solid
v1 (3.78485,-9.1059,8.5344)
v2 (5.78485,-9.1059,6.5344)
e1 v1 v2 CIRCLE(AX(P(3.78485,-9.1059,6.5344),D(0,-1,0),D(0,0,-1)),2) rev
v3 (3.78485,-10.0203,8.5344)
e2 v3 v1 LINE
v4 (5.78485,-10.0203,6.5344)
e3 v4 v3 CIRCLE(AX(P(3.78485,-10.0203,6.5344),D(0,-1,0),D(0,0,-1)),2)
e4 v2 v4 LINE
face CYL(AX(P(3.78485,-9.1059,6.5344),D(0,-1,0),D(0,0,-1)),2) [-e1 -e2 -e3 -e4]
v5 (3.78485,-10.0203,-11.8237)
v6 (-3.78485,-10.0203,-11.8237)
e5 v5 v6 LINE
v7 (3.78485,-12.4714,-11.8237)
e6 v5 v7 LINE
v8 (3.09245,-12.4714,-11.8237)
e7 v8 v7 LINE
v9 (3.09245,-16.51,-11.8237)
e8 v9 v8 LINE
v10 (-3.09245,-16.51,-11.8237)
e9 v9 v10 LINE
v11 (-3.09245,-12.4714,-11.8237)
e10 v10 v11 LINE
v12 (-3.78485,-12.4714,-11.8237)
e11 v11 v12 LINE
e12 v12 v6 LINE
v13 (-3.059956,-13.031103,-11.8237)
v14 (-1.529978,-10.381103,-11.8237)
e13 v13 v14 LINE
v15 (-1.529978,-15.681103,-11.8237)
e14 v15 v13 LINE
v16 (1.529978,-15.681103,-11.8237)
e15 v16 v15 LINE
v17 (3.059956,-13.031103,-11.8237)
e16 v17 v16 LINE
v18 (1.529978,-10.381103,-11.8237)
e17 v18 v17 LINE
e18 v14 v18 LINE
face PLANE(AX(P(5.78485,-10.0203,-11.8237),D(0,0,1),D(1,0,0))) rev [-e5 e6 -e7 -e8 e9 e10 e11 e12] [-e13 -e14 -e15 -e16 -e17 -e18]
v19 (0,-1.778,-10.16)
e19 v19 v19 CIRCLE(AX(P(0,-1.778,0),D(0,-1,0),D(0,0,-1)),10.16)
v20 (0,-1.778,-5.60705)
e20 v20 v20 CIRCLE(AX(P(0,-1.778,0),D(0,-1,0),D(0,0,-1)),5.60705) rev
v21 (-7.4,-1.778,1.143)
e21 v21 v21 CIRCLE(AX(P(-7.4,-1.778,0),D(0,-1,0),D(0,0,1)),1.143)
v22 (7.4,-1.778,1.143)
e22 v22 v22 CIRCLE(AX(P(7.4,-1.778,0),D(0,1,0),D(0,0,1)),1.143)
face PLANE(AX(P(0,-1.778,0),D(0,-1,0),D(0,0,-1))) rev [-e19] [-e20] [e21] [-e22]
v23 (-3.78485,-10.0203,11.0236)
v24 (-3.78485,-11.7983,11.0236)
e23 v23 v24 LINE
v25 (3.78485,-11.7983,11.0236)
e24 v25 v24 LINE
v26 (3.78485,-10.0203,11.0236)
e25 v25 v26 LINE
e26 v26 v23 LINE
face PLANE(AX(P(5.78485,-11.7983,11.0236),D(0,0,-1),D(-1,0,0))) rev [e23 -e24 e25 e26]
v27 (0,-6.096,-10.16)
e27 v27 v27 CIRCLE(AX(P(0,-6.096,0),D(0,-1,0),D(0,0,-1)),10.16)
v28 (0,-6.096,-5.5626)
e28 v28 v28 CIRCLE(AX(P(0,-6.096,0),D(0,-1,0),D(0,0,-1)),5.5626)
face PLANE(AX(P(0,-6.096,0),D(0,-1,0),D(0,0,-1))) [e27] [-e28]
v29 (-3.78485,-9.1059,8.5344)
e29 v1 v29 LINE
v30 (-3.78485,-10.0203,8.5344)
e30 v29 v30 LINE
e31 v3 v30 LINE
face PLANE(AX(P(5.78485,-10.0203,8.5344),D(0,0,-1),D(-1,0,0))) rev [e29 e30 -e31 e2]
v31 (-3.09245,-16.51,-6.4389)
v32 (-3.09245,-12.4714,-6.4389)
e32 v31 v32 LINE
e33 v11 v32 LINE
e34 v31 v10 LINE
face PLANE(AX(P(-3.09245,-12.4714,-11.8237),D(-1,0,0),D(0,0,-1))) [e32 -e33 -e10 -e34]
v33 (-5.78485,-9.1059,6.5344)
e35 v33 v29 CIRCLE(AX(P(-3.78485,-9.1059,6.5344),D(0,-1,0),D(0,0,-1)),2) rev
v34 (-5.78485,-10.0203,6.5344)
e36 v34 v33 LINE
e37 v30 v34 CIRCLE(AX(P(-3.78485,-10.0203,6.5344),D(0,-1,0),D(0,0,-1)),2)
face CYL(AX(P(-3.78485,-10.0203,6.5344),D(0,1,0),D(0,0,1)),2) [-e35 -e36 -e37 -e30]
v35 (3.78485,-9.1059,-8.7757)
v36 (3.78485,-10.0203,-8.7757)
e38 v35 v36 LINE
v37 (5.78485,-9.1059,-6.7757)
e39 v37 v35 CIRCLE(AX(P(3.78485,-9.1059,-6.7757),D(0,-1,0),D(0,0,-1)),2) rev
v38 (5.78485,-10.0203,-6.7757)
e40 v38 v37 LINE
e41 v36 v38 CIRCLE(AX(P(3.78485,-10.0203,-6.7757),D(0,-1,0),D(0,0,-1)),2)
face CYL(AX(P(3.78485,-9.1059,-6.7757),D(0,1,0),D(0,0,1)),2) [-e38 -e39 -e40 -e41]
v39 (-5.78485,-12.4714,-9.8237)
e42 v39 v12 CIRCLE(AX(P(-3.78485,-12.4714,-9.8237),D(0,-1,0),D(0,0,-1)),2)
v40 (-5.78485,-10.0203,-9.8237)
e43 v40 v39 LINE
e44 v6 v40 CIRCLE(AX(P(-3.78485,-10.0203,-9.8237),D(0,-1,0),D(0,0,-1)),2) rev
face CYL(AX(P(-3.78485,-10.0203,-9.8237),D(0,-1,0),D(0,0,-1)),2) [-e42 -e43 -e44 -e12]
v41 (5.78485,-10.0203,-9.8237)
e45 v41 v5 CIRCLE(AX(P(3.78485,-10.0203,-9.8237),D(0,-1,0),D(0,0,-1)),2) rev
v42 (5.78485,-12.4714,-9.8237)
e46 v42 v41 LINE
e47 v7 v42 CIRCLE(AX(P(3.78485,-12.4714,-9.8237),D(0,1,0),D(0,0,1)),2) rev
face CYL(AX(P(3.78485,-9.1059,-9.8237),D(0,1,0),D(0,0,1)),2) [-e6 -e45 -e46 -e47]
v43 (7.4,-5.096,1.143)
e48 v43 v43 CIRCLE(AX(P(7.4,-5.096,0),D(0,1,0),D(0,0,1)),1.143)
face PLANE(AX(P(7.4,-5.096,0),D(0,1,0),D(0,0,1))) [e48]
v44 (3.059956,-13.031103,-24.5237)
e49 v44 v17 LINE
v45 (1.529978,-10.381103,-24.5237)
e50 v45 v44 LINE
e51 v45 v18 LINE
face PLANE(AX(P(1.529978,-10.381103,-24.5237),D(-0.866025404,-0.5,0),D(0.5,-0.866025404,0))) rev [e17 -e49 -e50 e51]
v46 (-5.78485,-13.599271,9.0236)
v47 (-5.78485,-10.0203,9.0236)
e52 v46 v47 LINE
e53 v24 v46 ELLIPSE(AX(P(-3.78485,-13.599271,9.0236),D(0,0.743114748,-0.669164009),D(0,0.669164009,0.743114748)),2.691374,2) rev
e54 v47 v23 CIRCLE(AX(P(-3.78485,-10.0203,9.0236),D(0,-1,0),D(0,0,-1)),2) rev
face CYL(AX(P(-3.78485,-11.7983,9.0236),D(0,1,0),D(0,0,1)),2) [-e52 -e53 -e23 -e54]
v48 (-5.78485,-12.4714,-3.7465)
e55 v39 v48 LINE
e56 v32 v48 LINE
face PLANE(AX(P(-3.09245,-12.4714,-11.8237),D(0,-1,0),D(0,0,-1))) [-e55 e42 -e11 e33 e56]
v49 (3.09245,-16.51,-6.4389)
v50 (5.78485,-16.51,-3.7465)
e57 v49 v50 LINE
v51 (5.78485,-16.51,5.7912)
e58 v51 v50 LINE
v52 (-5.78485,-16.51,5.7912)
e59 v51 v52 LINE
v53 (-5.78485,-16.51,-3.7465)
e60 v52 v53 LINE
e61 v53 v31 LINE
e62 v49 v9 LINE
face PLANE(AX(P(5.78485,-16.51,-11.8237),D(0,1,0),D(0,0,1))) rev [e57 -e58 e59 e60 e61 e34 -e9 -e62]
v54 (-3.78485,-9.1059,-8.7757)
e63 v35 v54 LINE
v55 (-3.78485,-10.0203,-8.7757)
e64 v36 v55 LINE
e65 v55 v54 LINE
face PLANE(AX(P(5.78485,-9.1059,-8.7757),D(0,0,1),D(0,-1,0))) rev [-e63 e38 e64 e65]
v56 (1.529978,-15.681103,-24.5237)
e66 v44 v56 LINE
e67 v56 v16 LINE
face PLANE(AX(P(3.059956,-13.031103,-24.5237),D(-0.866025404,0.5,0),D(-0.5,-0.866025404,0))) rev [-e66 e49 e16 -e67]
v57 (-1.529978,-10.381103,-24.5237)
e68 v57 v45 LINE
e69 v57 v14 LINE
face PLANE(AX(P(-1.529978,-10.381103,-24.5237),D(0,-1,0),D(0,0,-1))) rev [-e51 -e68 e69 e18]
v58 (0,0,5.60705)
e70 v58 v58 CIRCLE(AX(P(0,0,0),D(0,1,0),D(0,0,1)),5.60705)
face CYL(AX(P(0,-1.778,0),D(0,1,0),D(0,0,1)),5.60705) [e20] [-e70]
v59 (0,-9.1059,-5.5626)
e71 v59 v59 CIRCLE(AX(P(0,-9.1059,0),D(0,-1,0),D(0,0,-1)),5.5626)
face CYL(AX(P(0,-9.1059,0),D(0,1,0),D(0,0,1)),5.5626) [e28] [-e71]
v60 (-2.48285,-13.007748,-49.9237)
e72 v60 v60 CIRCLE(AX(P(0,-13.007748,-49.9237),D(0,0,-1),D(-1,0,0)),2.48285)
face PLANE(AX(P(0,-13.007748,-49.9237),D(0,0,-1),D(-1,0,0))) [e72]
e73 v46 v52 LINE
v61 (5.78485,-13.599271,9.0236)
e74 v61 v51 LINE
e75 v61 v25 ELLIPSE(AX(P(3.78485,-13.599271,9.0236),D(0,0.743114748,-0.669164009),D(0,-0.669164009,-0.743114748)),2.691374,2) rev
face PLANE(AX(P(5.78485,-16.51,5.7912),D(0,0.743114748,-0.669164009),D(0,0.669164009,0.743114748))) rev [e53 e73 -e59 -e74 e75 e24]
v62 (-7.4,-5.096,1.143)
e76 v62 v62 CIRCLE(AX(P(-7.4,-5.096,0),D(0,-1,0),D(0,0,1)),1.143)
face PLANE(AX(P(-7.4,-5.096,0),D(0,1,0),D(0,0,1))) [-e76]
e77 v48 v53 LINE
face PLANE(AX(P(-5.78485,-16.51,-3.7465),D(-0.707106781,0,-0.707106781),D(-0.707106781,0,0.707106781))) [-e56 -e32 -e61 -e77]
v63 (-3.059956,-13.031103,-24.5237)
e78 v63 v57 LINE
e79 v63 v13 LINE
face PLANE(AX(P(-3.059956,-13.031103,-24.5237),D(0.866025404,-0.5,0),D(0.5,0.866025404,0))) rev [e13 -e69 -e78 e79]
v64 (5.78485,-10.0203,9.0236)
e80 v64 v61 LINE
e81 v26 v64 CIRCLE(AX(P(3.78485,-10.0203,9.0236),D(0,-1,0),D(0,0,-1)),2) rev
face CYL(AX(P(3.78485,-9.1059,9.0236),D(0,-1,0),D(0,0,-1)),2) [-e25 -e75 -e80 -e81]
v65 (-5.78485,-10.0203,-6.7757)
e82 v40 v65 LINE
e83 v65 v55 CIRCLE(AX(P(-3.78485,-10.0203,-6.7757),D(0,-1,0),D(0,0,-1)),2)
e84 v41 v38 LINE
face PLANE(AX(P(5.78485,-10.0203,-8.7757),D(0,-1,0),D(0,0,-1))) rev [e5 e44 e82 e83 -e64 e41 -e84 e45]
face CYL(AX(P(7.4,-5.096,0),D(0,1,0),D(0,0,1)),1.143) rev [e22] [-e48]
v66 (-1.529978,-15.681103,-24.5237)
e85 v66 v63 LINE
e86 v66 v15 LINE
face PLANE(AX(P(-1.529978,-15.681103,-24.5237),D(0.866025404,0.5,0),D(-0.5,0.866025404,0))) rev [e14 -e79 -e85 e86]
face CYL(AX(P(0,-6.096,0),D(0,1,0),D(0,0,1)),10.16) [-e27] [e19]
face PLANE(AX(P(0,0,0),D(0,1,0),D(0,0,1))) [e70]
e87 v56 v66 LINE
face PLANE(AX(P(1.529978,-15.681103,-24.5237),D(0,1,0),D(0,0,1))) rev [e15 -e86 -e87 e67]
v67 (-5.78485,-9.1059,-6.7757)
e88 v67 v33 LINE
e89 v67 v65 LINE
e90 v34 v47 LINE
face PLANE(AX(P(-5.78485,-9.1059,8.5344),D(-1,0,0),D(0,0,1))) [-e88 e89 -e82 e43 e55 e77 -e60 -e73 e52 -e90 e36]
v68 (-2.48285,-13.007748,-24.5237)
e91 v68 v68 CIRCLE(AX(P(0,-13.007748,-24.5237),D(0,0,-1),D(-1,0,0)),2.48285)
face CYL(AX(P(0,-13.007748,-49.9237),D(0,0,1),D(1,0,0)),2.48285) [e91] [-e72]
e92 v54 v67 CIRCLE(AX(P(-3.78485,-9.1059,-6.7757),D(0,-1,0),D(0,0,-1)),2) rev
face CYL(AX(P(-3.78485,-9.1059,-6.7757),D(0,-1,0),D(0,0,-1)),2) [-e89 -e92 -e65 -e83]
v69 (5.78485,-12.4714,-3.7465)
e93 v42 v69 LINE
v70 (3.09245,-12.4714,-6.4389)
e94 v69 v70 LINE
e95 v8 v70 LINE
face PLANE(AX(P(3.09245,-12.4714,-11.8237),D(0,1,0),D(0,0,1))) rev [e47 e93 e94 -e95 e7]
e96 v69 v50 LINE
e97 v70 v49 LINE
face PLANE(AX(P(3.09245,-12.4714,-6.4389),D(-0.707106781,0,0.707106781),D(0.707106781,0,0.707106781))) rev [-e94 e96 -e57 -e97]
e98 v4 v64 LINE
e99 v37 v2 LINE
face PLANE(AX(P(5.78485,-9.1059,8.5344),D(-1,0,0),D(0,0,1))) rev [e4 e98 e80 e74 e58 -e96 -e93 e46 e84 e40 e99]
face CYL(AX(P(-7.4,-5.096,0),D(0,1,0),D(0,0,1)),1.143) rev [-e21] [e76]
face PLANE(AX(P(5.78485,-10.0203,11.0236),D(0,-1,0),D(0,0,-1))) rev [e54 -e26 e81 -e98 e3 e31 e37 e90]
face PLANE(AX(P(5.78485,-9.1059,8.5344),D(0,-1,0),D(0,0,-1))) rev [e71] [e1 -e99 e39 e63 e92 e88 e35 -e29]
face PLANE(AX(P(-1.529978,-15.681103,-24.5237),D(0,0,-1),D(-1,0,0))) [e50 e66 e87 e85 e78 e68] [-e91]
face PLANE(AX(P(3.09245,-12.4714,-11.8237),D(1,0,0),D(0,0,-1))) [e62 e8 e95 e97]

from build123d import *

# Parameters (mm, degrees)
SKETCH1_R                = 5.60705
BOSS_EXTRUDE1_DEPTH      = 1.778
SKETCH2_R                = 10.16
BOSS_EXTRUDE2_DEPTH      = 4.318
SKETCH3_R                = 1.143
CUT_EXTRUDE1_DEPTH       = 3.318
SKETCH4_R                = 5.5626
BOSS_EXTRUDE3_DEPTH      = 3.0099
BOSS_EXTRUDE4_DEPTH      = 5.78485
FILLET1_R                = 2
FILLET2_R                = 2
SKETCH6_W                = 8.0772
SKETCH6_H                = 4.0386
CUT_EXTRUDE2_DEPTH       = 2.6924
CHAMFER1_SIZE            = 2.6924
CHAMFER1_OF_MIRROR2_SIZE = 2.6924
FILLET3_R                = 2
BOSS_EXTRUDE5_DEPTH      = 12.7
SKETCH8_R                = 2.48285
BOSS_EXTRUDE6_DEPTH      = 25.4


with BuildPart() as part:
    # Sketch1 → Boss-Extrude1 (new body)
    with BuildSketch(Plane(origin=(0, 0, 0), x_dir=(1, 0, 0), z_dir=(0, 1, 0))):
        with Locations(Location((0, 0, 0), (0, 0, 270))):
            Circle(SKETCH1_R)
    extrude(amount=-BOSS_EXTRUDE1_DEPTH)

    # Sketch2 → Boss-Extrude2 (add)
    with BuildSketch(Plane.XZ.offset(1.778)):
        with Locations(Location((0, 0, 0), (0, 0, 270))):
            Circle(SKETCH2_R)
    extrude(amount=BOSS_EXTRUDE2_DEPTH)

    # Sketch3 → Cut-Extrude1 (cut)
    with BuildSketch(Plane(origin=(0, -1.778, 0), x_dir=(1, 0, 0), z_dir=(0, 1, 0))):
        with Locations(Location((7.4, 0, 0), (0, 0, 270))):
            Circle(SKETCH3_R)
    cut_extrude1 = extrude(amount=-CUT_EXTRUDE1_DEPTH, mode=Mode.SUBTRACT)

    # Mirror1: Cut-Extrude1 across plane
    add(cut_extrude1.mirror(Plane(origin=(0, 0, 0), x_dir=(0, 0, 1), z_dir=(1, 0, 0))), mode=Mode.SUBTRACT)

    # Sketch4 → Boss-Extrude3 (add)
    with BuildSketch(Plane.XZ.offset(6.096)):
        with Locations(Location((0, 0, 0), (0, 0, 270))):
            Circle(SKETCH4_R)
    extrude(amount=BOSS_EXTRUDE3_DEPTH)

    # Sketch5 → Boss-Extrude4 (add, symmetric)
    with BuildSketch(Plane(origin=(0, 0, 0), x_dir=(0, 0, -1), z_dir=(1, 0, 0))):
        Polygon((-8.5344, -9.1059), (8.7757, -9.1059), (8.7757, -10.0203), (11.8237, -10.0203), (11.8237, -16.51), (-5.7912, -16.51), (-11.0236, -11.7983), (-11.0236, -10.0203), (-8.5344, -10.0203), align=None)
    extrude(amount=BOSS_EXTRUDE4_DEPTH, both=True)

    # Fillet1
    fillet1_edges = [part.edges().sort_by_distance(p)[0] for p in [
        (-5.78485, -9.5631, 8.5344),
        (-5.78485, -9.5631, -8.7757),
        (5.78485, -9.5631, 8.5344),
        (5.78485, -9.5631, -8.7757),
    ]]
    fillet(fillet1_edges, radius=FILLET1_R)

    # Fillet2
    fillet2_edges = [part.edges().sort_by_distance(p)[0] for p in [
        (-5.78485, -10.9093, 11.0236),
        (5.78485, -10.9093, 11.0236),
    ]]
    fillet(fillet2_edges, radius=FILLET2_R)

    # Sketch6 → Cut-Extrude2 (cut)
    with BuildSketch(Plane(origin=(5.78485, 0, 0), x_dir=(0, 0, -1), z_dir=(1, 0, 0))):
        with Locations((7.7851, -14.4907)):
            Rectangle(SKETCH6_W, SKETCH6_H)
    cut_extrude2 = extrude(amount=-CUT_EXTRUDE2_DEPTH, mode=Mode.SUBTRACT)

    # Chamfer1
    chamfer1_edges = [part.edges().sort_by_distance(p)[0] for p in [
        (3.09245, -14.4907, -3.7465),
    ]]
    chamfer(chamfer1_edges, length=CHAMFER1_SIZE - 0.0001)  # a hair under: the kernel refuses the full size

    # Mirror2: Cut-Extrude2 across plane
    add(cut_extrude2.mirror(Plane(origin=(0, 0, 0), x_dir=(0, 0, 1), z_dir=(1, 0, 0))), mode=Mode.SUBTRACT)

    # Chamfer1 of Mirror2
    chamfer1_of_mirror2_edges = [part.edges().sort_by_distance(p)[0] for p in [
        (-3.09245, -14.4907, -3.7465),
    ]]
    chamfer(chamfer1_of_mirror2_edges, length=CHAMFER1_OF_MIRROR2_SIZE - 0.0001)  # a hair under: the kernel refuses the full size

    # Fillet3
    fillet3_edges = [part.edges().sort_by_distance(p)[0] for p in [
        (-5.78485, -11.24585, -11.8237),
        (5.78485, -11.24585, -11.8237),
    ]]
    fillet(fillet3_edges, radius=FILLET3_R)

    # Sketch7 → Boss-Extrude5 (add)
    with BuildSketch(Plane(origin=(0, 0, -11.8237), x_dir=(-1, 0, 0), z_dir=(0, 0, -1))):
        Polygon((1.529978213, -15.681103357), (3.059956427, -13.031103357), (1.529978213, -10.381103357), (-1.529978213, -10.381103357), (-3.059956427, -13.031103357), (-1.529978213, -15.681103357), align=None)
    extrude(amount=BOSS_EXTRUDE5_DEPTH)

    # Sketch8 → Boss-Extrude6 (add)
    with BuildSketch(Plane(origin=(0, 0, -24.5237), x_dir=(-1, 0, 0), z_dir=(0, 0, -1))):
        with Locations((0, -13.007748328)):
            Circle(SKETCH8_R)
    extrude(amount=BOSS_EXTRUDE6_DEPTH)


solid = part.part
